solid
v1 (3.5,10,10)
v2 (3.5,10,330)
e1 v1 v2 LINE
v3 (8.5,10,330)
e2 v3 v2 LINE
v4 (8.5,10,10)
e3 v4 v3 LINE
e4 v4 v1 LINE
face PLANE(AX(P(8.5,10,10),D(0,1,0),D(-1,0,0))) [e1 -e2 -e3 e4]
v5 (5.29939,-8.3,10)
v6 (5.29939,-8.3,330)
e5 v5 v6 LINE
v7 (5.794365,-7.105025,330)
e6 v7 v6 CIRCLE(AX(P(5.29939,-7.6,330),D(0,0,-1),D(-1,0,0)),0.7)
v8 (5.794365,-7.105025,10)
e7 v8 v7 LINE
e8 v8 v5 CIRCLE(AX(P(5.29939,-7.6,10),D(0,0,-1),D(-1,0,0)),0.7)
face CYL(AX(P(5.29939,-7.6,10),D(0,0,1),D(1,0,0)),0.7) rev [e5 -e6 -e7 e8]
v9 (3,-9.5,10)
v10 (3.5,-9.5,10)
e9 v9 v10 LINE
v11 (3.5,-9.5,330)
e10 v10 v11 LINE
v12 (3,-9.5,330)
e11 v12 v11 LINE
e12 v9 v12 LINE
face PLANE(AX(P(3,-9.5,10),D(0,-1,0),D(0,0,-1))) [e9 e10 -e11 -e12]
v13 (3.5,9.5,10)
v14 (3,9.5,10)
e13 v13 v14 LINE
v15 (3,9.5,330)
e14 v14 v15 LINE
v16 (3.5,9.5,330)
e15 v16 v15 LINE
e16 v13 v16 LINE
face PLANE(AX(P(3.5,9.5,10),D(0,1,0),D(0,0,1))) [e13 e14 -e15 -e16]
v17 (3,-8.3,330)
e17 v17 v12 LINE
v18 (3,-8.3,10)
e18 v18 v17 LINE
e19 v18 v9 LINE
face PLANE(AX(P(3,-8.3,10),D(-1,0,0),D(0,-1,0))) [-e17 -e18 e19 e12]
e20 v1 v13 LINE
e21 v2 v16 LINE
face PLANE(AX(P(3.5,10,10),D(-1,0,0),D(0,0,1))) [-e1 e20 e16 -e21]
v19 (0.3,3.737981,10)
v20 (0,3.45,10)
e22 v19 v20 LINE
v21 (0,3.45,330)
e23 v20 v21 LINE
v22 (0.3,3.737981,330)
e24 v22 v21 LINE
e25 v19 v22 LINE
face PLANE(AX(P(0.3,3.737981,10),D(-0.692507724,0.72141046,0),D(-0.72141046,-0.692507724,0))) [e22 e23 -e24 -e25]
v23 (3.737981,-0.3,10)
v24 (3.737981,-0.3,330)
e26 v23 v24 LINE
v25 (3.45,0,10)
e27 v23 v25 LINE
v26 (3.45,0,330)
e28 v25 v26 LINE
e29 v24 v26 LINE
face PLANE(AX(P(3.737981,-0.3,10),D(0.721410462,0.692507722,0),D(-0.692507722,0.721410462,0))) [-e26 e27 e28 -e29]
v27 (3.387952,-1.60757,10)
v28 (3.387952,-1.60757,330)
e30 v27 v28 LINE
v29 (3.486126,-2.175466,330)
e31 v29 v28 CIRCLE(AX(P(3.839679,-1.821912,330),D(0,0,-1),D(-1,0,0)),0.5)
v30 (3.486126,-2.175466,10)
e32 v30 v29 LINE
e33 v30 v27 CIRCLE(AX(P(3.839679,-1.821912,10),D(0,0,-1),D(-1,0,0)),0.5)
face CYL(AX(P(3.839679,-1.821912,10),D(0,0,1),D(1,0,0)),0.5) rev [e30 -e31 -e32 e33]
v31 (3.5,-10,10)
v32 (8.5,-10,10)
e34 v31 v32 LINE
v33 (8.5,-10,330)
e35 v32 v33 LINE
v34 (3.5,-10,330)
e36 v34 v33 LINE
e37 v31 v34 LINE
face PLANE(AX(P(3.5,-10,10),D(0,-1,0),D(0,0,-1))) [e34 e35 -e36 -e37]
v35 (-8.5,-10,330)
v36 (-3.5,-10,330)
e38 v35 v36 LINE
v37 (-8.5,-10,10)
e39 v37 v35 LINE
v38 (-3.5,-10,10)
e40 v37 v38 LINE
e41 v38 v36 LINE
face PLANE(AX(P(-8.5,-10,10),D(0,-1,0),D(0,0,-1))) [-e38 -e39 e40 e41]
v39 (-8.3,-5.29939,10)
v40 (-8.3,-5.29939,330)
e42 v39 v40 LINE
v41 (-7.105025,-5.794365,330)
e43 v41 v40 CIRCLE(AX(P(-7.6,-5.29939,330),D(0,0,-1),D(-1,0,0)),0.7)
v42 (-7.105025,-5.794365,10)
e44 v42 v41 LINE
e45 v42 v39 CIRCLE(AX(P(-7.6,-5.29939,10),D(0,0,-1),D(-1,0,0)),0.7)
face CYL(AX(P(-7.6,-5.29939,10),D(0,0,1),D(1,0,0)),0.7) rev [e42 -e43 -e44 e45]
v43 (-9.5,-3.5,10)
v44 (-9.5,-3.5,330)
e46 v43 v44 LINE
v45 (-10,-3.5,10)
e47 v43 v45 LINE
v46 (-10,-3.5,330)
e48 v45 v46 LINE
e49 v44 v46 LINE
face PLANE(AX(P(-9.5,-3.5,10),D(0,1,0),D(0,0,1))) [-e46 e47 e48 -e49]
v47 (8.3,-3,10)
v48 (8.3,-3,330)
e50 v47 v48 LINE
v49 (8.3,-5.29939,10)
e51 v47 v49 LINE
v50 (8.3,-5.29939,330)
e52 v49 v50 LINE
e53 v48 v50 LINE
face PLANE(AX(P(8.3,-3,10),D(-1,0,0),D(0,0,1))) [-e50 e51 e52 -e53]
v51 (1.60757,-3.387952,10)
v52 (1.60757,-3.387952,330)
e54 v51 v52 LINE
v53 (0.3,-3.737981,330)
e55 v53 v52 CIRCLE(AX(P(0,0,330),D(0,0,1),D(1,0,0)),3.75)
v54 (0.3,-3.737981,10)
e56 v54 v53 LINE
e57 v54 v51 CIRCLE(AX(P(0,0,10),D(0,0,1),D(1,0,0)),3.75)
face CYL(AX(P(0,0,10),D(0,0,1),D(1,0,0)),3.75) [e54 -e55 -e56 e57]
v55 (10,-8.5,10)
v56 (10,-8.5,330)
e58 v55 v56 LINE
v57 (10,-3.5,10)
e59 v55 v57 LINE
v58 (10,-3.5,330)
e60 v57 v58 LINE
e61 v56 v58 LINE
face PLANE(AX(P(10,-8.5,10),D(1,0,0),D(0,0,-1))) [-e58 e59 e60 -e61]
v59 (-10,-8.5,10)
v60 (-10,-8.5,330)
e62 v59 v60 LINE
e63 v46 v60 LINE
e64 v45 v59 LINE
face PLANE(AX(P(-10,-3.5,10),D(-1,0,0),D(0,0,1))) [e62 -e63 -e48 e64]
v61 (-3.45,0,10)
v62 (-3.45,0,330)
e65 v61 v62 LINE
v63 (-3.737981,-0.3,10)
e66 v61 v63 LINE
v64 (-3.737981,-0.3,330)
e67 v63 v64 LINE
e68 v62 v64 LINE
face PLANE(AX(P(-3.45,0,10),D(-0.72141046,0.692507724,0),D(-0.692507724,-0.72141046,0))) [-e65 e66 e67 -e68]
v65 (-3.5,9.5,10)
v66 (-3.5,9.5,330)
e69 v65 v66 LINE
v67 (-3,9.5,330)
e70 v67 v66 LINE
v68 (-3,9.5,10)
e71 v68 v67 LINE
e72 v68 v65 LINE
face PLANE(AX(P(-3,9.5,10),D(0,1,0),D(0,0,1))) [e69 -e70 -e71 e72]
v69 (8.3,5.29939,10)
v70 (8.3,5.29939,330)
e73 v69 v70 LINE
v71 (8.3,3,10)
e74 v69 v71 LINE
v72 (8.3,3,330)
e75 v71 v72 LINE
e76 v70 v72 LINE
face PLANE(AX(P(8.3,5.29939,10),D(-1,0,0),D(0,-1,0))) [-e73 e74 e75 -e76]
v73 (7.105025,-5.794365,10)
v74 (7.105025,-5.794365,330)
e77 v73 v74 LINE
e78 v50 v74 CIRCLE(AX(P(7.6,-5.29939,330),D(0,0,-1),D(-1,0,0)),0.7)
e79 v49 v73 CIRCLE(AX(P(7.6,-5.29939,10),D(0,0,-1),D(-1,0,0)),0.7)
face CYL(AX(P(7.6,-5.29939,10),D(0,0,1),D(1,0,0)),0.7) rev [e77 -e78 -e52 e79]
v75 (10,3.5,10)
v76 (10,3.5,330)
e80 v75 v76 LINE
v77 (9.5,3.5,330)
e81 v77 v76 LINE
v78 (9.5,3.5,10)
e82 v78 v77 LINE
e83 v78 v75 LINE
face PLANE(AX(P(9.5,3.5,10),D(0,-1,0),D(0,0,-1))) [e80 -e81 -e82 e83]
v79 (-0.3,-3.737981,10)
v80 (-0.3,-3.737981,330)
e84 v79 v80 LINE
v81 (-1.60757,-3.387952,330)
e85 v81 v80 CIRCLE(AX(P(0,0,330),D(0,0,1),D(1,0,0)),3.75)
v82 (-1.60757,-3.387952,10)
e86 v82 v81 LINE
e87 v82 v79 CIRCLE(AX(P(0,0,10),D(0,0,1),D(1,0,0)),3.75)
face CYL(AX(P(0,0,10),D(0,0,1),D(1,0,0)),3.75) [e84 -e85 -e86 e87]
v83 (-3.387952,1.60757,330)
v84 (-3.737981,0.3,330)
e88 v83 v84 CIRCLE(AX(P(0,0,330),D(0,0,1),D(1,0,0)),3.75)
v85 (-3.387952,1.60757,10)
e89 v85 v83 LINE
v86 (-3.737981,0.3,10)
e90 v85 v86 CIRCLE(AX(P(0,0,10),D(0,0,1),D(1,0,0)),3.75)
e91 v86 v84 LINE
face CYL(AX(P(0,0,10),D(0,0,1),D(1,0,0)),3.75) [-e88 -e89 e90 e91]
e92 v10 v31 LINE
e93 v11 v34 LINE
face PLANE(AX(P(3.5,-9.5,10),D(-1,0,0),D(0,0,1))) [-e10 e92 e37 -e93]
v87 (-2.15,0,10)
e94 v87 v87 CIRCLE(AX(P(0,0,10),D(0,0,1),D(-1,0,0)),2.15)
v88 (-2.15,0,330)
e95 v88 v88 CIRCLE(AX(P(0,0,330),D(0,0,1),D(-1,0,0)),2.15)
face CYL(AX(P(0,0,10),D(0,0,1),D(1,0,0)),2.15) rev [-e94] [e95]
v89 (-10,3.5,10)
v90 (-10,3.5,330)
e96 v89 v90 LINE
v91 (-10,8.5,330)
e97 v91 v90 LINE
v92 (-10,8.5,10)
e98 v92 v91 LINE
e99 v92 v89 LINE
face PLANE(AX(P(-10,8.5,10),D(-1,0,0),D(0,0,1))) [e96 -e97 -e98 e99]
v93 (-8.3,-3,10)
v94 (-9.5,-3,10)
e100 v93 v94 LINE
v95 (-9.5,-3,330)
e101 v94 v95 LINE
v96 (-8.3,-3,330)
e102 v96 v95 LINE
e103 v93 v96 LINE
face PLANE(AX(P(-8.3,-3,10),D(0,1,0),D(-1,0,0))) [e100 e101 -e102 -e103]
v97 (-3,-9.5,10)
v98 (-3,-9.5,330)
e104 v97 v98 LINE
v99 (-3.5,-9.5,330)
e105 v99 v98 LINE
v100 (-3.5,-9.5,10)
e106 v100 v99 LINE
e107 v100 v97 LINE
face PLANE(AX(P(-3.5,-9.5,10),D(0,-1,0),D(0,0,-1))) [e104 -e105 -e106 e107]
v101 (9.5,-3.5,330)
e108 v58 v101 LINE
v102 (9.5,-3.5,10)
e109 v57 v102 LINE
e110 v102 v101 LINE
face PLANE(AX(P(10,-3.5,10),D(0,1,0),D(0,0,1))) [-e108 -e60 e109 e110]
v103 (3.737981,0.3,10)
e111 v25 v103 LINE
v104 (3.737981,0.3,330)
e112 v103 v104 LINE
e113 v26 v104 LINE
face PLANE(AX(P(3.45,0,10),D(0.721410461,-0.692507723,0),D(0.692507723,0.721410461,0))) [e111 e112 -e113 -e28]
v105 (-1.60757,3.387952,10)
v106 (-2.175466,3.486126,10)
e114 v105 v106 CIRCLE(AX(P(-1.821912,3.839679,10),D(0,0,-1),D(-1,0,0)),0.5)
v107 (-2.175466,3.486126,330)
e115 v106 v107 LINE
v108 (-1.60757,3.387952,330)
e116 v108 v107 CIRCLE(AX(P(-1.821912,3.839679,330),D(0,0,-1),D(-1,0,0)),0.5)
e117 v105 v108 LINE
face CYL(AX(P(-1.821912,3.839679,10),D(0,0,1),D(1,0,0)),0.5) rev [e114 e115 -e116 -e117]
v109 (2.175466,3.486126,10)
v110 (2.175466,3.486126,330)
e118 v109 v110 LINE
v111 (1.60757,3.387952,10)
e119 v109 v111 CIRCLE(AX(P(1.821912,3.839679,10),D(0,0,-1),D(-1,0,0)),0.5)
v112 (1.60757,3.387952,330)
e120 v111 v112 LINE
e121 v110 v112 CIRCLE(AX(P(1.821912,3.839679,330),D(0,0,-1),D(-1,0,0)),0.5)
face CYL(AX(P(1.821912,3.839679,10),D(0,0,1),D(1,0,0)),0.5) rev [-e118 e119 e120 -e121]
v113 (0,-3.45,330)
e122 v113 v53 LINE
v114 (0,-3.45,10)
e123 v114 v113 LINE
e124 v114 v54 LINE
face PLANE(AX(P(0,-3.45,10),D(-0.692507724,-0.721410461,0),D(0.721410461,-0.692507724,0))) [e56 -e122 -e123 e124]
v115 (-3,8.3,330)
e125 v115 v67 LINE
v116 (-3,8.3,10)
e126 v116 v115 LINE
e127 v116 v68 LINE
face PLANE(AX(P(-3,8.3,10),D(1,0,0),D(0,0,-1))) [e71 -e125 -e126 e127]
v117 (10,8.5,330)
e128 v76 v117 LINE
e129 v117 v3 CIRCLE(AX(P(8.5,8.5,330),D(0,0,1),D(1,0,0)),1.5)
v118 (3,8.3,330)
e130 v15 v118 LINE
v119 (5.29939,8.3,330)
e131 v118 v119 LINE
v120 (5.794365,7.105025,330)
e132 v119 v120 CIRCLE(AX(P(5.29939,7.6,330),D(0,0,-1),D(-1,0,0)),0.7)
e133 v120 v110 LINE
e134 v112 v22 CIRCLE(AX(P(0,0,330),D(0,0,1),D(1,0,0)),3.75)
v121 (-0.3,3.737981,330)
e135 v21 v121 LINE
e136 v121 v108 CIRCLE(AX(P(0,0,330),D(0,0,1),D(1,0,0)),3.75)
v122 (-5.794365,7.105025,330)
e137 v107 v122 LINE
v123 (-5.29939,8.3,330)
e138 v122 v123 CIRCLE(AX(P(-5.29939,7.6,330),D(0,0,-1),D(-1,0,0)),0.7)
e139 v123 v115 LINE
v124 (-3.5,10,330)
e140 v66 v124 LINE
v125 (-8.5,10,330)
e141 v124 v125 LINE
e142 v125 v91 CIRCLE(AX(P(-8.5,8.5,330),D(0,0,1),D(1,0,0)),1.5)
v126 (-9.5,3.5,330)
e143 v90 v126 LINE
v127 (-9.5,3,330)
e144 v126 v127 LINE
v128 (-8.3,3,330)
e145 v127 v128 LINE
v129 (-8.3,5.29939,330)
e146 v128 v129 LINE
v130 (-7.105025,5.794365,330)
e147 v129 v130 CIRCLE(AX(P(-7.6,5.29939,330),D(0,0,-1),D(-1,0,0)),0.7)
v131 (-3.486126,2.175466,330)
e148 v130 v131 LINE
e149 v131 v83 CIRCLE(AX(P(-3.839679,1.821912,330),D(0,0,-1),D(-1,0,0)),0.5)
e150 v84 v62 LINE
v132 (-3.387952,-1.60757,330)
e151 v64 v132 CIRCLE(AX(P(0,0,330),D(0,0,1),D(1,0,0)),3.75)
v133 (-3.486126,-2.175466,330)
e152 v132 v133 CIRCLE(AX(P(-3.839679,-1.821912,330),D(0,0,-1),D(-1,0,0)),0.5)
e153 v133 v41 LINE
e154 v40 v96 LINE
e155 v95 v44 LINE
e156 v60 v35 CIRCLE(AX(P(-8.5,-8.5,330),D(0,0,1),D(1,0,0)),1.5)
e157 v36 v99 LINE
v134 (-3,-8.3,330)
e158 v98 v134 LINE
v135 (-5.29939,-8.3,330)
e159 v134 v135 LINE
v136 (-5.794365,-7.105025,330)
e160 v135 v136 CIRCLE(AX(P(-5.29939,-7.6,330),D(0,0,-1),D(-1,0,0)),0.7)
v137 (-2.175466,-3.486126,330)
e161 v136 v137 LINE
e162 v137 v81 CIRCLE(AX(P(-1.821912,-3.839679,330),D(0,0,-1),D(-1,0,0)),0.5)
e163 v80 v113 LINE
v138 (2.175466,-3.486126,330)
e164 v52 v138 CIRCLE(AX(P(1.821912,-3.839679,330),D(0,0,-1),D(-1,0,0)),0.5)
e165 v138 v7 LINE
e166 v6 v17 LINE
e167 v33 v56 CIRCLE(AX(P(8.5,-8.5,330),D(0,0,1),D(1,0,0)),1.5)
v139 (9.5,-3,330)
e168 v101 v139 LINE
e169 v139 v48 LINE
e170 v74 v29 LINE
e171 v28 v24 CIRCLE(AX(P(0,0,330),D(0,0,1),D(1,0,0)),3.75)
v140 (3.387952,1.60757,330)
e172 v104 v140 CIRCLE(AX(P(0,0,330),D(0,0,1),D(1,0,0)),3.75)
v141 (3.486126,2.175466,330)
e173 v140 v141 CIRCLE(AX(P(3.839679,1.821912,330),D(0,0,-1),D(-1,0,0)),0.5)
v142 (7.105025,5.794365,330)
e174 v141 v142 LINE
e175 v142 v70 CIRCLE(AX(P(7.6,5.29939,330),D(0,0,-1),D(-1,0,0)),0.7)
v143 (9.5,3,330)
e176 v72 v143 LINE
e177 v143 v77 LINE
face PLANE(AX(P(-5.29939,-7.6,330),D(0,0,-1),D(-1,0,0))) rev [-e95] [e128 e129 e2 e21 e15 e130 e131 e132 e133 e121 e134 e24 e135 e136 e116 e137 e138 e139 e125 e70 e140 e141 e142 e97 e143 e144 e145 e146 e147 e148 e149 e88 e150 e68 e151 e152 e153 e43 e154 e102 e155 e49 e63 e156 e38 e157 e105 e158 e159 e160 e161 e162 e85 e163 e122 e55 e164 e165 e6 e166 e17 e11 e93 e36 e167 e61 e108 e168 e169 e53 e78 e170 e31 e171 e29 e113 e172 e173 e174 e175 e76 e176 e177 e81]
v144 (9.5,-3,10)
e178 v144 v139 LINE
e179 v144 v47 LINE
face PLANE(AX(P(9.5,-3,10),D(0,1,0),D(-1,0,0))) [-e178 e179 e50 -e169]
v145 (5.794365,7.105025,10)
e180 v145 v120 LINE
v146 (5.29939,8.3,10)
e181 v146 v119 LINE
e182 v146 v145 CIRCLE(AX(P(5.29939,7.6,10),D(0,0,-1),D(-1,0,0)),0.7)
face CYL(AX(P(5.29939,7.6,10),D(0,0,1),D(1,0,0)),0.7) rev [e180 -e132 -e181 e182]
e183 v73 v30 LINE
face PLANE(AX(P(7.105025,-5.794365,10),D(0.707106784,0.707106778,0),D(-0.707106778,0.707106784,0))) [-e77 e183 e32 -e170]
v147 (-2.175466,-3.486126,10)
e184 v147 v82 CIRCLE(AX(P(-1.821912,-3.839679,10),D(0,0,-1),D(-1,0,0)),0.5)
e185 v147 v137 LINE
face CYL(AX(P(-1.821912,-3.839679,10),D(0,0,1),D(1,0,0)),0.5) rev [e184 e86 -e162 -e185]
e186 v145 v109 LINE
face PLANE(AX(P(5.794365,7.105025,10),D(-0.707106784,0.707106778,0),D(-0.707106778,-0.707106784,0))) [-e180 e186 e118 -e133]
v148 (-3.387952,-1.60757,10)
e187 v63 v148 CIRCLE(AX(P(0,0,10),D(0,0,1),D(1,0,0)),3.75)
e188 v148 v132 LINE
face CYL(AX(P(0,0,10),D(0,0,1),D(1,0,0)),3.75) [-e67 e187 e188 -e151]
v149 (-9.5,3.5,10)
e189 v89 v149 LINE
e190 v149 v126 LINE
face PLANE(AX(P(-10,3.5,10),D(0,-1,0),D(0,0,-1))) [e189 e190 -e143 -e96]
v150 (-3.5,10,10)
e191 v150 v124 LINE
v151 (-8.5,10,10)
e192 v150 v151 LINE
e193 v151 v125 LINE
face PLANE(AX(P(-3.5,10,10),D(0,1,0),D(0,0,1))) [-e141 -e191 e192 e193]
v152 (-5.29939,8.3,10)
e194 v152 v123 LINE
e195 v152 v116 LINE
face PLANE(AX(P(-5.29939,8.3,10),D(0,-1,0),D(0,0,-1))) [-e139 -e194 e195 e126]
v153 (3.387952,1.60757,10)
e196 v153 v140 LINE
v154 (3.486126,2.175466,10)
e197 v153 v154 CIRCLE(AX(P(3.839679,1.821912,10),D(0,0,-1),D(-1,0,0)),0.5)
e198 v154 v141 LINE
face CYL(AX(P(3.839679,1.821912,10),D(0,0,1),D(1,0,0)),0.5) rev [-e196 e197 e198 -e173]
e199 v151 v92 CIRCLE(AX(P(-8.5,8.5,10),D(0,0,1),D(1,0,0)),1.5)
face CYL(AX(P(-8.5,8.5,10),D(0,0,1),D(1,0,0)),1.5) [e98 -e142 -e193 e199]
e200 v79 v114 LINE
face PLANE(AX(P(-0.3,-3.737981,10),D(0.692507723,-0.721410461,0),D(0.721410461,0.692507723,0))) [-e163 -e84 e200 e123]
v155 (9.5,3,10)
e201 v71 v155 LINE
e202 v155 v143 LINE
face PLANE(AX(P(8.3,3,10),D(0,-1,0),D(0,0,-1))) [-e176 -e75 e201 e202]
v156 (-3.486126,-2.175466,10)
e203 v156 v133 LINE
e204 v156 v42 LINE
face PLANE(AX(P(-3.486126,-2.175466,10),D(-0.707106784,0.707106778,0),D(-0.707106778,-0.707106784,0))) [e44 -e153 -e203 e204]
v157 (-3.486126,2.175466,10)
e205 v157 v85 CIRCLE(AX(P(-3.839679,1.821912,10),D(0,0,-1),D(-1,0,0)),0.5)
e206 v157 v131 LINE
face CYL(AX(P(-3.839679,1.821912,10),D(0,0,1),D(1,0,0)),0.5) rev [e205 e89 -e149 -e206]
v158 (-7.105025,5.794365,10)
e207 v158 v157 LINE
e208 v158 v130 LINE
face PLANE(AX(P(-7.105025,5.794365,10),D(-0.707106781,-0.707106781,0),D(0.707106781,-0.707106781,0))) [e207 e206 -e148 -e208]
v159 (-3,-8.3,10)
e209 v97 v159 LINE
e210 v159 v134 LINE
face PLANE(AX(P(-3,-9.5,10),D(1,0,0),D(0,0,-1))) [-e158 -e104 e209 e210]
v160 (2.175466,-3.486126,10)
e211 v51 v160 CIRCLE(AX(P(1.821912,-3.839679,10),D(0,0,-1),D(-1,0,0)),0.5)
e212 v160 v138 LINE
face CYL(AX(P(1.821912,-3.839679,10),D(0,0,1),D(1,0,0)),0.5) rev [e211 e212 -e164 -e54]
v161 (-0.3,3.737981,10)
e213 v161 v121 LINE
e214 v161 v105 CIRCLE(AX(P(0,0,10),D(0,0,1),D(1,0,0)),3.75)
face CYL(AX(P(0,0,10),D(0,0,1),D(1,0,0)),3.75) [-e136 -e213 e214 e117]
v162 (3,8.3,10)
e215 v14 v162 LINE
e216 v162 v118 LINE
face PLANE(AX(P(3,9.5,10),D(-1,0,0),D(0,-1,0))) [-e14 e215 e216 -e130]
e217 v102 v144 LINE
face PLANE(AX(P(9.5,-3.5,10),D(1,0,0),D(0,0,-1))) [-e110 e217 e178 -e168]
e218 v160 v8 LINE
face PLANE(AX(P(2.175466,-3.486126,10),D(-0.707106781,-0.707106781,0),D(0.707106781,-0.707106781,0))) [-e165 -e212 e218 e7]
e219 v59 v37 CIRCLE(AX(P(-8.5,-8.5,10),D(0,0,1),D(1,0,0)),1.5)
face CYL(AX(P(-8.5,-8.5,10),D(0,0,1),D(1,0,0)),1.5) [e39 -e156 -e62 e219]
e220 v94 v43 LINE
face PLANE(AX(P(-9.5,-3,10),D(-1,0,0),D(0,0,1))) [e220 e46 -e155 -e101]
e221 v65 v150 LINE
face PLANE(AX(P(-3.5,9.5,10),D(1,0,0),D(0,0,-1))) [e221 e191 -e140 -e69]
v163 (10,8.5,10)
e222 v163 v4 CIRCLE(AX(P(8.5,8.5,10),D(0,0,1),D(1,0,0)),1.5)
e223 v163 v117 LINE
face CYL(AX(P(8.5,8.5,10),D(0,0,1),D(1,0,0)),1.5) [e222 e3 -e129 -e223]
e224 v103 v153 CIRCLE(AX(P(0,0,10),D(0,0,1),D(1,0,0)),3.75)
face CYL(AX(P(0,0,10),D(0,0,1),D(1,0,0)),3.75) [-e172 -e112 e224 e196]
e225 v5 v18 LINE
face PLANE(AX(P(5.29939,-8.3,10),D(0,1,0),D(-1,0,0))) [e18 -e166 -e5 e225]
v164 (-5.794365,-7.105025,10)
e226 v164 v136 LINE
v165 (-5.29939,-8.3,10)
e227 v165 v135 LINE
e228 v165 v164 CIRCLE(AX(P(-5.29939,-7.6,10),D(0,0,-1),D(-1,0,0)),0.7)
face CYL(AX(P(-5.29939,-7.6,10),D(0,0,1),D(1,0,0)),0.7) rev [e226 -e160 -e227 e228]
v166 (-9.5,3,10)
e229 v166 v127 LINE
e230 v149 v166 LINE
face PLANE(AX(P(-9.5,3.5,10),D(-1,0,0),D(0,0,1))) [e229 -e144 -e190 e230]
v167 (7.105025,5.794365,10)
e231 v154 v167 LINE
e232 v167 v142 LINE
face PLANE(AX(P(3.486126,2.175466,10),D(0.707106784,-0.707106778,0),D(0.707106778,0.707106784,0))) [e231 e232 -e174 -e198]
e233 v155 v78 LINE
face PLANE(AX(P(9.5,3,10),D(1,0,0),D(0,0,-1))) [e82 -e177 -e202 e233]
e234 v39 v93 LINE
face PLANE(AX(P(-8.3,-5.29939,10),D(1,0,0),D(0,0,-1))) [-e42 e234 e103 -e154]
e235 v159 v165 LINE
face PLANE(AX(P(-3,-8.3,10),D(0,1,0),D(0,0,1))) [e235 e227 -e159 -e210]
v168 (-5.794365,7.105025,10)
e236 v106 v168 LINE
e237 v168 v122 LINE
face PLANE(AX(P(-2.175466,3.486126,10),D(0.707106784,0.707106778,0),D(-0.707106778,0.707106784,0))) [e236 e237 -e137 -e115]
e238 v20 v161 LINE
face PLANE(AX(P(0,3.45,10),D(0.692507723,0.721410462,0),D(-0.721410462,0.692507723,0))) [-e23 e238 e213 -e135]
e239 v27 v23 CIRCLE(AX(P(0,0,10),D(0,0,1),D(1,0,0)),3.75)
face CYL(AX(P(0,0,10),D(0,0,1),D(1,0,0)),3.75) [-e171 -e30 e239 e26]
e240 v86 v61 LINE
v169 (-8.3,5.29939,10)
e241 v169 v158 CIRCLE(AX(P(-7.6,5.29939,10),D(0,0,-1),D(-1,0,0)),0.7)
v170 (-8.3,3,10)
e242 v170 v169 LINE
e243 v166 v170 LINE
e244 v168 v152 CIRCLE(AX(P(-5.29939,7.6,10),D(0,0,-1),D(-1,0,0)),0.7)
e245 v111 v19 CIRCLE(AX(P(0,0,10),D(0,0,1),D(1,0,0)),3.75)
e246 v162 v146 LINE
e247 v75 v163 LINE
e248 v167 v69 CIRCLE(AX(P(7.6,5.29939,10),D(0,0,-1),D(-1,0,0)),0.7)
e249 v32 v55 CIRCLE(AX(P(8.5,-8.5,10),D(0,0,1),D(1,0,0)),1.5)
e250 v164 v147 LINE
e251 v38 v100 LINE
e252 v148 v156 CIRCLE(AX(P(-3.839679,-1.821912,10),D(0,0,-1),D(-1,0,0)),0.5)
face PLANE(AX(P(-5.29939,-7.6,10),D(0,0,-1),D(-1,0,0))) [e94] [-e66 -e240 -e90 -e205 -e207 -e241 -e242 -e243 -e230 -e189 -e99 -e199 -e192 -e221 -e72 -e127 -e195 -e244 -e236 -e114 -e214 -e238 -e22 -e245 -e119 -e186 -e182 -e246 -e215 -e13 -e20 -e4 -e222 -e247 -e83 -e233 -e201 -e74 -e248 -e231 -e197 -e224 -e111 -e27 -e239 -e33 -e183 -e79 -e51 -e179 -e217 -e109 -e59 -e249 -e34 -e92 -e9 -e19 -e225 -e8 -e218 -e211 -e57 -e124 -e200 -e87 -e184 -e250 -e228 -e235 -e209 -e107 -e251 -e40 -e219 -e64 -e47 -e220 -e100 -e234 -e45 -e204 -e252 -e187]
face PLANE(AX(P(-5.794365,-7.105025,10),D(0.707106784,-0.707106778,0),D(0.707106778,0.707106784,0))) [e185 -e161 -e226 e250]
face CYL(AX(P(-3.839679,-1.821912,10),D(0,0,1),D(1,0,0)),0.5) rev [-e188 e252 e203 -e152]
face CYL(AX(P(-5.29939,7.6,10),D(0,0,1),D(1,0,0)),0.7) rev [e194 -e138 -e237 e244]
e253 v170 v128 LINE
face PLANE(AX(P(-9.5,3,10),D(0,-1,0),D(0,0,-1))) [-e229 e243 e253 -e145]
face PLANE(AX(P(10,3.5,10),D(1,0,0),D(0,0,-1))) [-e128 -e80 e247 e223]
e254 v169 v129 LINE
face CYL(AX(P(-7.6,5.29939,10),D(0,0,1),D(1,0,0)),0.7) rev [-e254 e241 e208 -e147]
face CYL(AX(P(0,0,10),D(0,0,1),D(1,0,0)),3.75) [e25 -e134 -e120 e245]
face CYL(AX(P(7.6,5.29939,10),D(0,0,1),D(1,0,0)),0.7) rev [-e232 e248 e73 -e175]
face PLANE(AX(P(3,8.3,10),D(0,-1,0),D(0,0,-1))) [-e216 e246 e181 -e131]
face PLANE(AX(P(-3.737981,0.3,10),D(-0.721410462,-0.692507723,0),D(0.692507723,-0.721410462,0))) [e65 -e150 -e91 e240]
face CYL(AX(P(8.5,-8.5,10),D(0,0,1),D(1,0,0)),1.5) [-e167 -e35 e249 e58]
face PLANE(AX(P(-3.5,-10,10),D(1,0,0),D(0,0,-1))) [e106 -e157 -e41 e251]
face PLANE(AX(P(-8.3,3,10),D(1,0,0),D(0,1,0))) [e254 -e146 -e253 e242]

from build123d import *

# Parameters (mm, degrees)
SKETCH1_R           = 2.15
BOSS_EXTRUDE1_DEPTH = 320


# Read off the part's stored shape, not the designer's step: moBlkMgr[nhom 20x20x300]
with BuildPart() as part:
    # Sketch1 → Boss-Extrude1 (new body)
    with BuildSketch(Plane.XY.offset(330)):
        with BuildLine():
            Line((-3.499999948, -10), (-3.499999948, -9.5))
            Line((-3.499999948, -9.5), (-2.999999948, -9.5))
            Line((-2.999999948, -9.5), (-2.999999948, -8.299999966))
            Line((-2.999999948, -8.299999966), (-5.299390249, -8.299999966))
            ThreePointArc((-5.299390249, -8.299999966), (-5.946105921, -7.86787837), (-5.794364998, -7.105025221))
            Line((-5.794364998, -7.105025221), (-2.175465548, -3.48612574))
            ThreePointArc((-2.175465548, -3.48612574), (-1.907085057, -3.346986956), (-1.607569547, -3.387952169))
            ThreePointArc((-1.607569547, -3.387952169), (-0.96970891, -3.622452814), (-0.299999981, -3.73798071))
            Line((-0.299999981, -3.73798071), (1.9e-08, -3.449999972))
            Line((1.9e-08, -3.449999972), (0.300000019, -3.737980711))
            ThreePointArc((0.300000019, -3.737980711), (0.969708957, -3.622452812), (1.607569601, -3.387952162))
            ThreePointArc((1.607569601, -3.387952162), (1.90708511, -3.346986948), (2.175465602, -3.48612573))
            Line((2.175465602, -3.48612573), (5.794365084, -7.105025212))
            ThreePointArc((5.794365084, -7.105025212), (5.946106011, -7.867878366), (5.299390334, -8.299999966))
            Line((5.299390334, -8.299999966), (2.999999948, -8.299999966))
            Line((2.999999948, -8.299999966), (2.999999948, -9.5))
            Line((2.999999948, -9.5), (3.499999948, -9.5))
            Line((3.499999948, -9.5), (3.499999948, -10))
            Line((3.499999948, -10), (8.499999948, -10))
            ThreePointArc((8.499999948, -10), (9.56066012, -9.560660172), (9.999999948, -8.5))
            Line((9.999999948, -8.5), (9.999999948, -3.5))
            Line((9.999999948, -3.5), (9.499999948, -3.5))
            Line((9.499999948, -3.5), (9.499999948, -3))
            Line((9.499999948, -3), (8.299999978, -3))
            Line((8.299999978, -3), (8.299999978, -5.299390319))
            ThreePointArc((8.299999978, -5.299390319), (7.867878379, -5.946105992), (7.105025229, -5.794365063))
            Line((7.105025229, -5.794365063), (3.486125768, -2.17546557))
            ThreePointArc((3.486125768, -2.17546557), (3.346986986, -1.907085078), (3.387952202, -1.607569568))
            ThreePointArc((3.387952202, -1.607569568), (3.622452857, -0.969708918), (3.737980757, -0.299999973))
            Line((3.737980757, -0.299999973), (3.450000019, 2.8e-08))
            Line((3.450000019, 2.8e-08), (3.737980758, 0.300000028))
            ThreePointArc((3.737980758, 0.300000028), (3.622452857, 0.969708973), (3.387952202, 1.607569624))
            ThreePointArc((3.387952202, 1.607569624), (3.346986986, 1.907085133), (3.486125768, 2.175465626))
            Line((3.486125768, 2.175465626), (7.105025231, 5.794365121))
            ThreePointArc((7.105025231, 5.794365121), (7.86787838, 5.94610605), (8.299999978, 5.299390377))
            Line((8.299999978, 5.299390377), (8.299999978, 3))
            Line((8.299999978, 3), (9.499999948, 3))
            Line((9.499999948, 3), (9.499999948, 3.5))
            Line((9.499999948, 3.5), (9.999999948, 3.5))
            Line((9.999999948, 3.5), (9.999999948, 8.5))
            ThreePointArc((9.999999948, 8.5), (9.56066012, 9.560660172), (8.499999948, 10))
            Line((8.499999948, 10), (3.499999948, 10))
            Line((3.499999948, 10), (3.499999948, 9.5))
            Line((3.499999948, 9.5), (2.999999948, 9.5))
            Line((2.999999948, 9.5), (2.999999948, 8.300000022))
            Line((2.999999948, 8.300000022), (5.299390294, 8.300000022))
            ThreePointArc((5.299390294, 8.300000022), (5.946105963, 7.867878428), (5.794365041, 7.105025282))
            Line((5.794365041, 7.105025282), (2.175465586, 3.486125796))
            ThreePointArc((2.175465586, 3.486125796), (1.907085095, 3.346987012), (1.607569585, 3.387952225))
            ThreePointArc((1.607569585, 3.387952225), (0.969708948, 3.62245287), (0.300000018, 3.737980766))
            Line((0.300000018, 3.737980766), (1.9e-08, 3.450000028))
            Line((1.9e-08, 3.450000028), (-0.299999982, 3.737980766))
            ThreePointArc((-0.299999982, 3.737980766), (-0.969708911, 3.62245287), (-1.607569547, 3.387952225))
            ThreePointArc((-1.607569547, 3.387952225), (-1.907085057, 3.346987012), (-2.175465548, 3.486125796))
            Line((-2.175465548, 3.486125796), (-5.794364998, 7.105025277))
            ThreePointArc((-5.794364998, 7.105025277), (-5.946105921, 7.867878426), (-5.299390249, 8.300000022))
            Line((-5.299390249, 8.300000022), (-2.999999948, 8.300000022))
            Line((-2.999999948, 8.300000022), (-2.999999948, 9.5))
            Line((-2.999999948, 9.5), (-3.499999948, 9.5))
            Line((-3.499999948, 9.5), (-3.499999948, 10))
            Line((-3.499999948, 10), (-8.499999948, 10))
            ThreePointArc((-8.499999948, 10), (-9.56066012, 9.560660172), (-9.999999948, 8.5))
            Line((-9.999999948, 8.5), (-9.999999948, 3.5))
            Line((-9.999999948, 3.5), (-9.499999948, 3.5))
            Line((-9.499999948, 3.5), (-9.499999948, 3))
            Line((-9.499999948, 3), (-8.29999994, 3))
            Line((-8.29999994, 3), (-8.29999994, 5.299390329))
            ThreePointArc((-8.29999994, 5.299390329), (-7.867878345, 5.946105998), (-7.105025201, 5.794365073))
            Line((-7.105025201, 5.794365073), (-3.486125739, 2.175465611))
            ThreePointArc((-3.486125739, 2.175465611), (-3.346986957, 1.907085119), (-3.387952171, 1.607569609))
            ThreePointArc((-3.387952171, 1.607569609), (-3.622452821, 0.969708966), (-3.737980719, 0.300000029))
            Line((-3.737980719, 0.300000029), (-3.449999981, 2.8e-08))
            Line((-3.449999981, 2.8e-08), (-3.737980719, -0.299999971))
            ThreePointArc((-3.737980719, -0.299999971), (-3.622452819, -0.969708917), (-3.387952164, -1.607569568))
            ThreePointArc((-3.387952164, -1.607569568), (-3.346986948, -1.907085078), (-3.486125729, -2.17546557))
            Line((-3.486125729, -2.17546557), (-7.105025191, -5.794365063))
            ThreePointArc((-7.105025191, -5.794365063), (-7.867878341, -5.946105992), (-8.29999994, -5.299390319))
            Line((-8.29999994, -5.299390319), (-8.29999994, -3))
            Line((-8.29999994, -3), (-9.499999948, -3))
            Line((-9.499999948, -3), (-9.499999948, -3.5))
            Line((-9.499999948, -3.5), (-9.999999948, -3.5))
            Line((-9.999999948, -3.5), (-9.999999948, -8.5))
            ThreePointArc((-9.999999948, -8.5), (-9.56066012, -9.560660172), (-8.499999948, -10))
            Line((-8.499999948, -10), (-3.499999948, -10))
        make_face()
        with Locations(Location((1.9e-08, 2.8e-08, 0), (0, 0, 180))):
            Circle(SKETCH1_R, mode=Mode.SUBTRACT)
    extrude(amount=-BOSS_EXTRUDE1_DEPTH)


solid = part.part
